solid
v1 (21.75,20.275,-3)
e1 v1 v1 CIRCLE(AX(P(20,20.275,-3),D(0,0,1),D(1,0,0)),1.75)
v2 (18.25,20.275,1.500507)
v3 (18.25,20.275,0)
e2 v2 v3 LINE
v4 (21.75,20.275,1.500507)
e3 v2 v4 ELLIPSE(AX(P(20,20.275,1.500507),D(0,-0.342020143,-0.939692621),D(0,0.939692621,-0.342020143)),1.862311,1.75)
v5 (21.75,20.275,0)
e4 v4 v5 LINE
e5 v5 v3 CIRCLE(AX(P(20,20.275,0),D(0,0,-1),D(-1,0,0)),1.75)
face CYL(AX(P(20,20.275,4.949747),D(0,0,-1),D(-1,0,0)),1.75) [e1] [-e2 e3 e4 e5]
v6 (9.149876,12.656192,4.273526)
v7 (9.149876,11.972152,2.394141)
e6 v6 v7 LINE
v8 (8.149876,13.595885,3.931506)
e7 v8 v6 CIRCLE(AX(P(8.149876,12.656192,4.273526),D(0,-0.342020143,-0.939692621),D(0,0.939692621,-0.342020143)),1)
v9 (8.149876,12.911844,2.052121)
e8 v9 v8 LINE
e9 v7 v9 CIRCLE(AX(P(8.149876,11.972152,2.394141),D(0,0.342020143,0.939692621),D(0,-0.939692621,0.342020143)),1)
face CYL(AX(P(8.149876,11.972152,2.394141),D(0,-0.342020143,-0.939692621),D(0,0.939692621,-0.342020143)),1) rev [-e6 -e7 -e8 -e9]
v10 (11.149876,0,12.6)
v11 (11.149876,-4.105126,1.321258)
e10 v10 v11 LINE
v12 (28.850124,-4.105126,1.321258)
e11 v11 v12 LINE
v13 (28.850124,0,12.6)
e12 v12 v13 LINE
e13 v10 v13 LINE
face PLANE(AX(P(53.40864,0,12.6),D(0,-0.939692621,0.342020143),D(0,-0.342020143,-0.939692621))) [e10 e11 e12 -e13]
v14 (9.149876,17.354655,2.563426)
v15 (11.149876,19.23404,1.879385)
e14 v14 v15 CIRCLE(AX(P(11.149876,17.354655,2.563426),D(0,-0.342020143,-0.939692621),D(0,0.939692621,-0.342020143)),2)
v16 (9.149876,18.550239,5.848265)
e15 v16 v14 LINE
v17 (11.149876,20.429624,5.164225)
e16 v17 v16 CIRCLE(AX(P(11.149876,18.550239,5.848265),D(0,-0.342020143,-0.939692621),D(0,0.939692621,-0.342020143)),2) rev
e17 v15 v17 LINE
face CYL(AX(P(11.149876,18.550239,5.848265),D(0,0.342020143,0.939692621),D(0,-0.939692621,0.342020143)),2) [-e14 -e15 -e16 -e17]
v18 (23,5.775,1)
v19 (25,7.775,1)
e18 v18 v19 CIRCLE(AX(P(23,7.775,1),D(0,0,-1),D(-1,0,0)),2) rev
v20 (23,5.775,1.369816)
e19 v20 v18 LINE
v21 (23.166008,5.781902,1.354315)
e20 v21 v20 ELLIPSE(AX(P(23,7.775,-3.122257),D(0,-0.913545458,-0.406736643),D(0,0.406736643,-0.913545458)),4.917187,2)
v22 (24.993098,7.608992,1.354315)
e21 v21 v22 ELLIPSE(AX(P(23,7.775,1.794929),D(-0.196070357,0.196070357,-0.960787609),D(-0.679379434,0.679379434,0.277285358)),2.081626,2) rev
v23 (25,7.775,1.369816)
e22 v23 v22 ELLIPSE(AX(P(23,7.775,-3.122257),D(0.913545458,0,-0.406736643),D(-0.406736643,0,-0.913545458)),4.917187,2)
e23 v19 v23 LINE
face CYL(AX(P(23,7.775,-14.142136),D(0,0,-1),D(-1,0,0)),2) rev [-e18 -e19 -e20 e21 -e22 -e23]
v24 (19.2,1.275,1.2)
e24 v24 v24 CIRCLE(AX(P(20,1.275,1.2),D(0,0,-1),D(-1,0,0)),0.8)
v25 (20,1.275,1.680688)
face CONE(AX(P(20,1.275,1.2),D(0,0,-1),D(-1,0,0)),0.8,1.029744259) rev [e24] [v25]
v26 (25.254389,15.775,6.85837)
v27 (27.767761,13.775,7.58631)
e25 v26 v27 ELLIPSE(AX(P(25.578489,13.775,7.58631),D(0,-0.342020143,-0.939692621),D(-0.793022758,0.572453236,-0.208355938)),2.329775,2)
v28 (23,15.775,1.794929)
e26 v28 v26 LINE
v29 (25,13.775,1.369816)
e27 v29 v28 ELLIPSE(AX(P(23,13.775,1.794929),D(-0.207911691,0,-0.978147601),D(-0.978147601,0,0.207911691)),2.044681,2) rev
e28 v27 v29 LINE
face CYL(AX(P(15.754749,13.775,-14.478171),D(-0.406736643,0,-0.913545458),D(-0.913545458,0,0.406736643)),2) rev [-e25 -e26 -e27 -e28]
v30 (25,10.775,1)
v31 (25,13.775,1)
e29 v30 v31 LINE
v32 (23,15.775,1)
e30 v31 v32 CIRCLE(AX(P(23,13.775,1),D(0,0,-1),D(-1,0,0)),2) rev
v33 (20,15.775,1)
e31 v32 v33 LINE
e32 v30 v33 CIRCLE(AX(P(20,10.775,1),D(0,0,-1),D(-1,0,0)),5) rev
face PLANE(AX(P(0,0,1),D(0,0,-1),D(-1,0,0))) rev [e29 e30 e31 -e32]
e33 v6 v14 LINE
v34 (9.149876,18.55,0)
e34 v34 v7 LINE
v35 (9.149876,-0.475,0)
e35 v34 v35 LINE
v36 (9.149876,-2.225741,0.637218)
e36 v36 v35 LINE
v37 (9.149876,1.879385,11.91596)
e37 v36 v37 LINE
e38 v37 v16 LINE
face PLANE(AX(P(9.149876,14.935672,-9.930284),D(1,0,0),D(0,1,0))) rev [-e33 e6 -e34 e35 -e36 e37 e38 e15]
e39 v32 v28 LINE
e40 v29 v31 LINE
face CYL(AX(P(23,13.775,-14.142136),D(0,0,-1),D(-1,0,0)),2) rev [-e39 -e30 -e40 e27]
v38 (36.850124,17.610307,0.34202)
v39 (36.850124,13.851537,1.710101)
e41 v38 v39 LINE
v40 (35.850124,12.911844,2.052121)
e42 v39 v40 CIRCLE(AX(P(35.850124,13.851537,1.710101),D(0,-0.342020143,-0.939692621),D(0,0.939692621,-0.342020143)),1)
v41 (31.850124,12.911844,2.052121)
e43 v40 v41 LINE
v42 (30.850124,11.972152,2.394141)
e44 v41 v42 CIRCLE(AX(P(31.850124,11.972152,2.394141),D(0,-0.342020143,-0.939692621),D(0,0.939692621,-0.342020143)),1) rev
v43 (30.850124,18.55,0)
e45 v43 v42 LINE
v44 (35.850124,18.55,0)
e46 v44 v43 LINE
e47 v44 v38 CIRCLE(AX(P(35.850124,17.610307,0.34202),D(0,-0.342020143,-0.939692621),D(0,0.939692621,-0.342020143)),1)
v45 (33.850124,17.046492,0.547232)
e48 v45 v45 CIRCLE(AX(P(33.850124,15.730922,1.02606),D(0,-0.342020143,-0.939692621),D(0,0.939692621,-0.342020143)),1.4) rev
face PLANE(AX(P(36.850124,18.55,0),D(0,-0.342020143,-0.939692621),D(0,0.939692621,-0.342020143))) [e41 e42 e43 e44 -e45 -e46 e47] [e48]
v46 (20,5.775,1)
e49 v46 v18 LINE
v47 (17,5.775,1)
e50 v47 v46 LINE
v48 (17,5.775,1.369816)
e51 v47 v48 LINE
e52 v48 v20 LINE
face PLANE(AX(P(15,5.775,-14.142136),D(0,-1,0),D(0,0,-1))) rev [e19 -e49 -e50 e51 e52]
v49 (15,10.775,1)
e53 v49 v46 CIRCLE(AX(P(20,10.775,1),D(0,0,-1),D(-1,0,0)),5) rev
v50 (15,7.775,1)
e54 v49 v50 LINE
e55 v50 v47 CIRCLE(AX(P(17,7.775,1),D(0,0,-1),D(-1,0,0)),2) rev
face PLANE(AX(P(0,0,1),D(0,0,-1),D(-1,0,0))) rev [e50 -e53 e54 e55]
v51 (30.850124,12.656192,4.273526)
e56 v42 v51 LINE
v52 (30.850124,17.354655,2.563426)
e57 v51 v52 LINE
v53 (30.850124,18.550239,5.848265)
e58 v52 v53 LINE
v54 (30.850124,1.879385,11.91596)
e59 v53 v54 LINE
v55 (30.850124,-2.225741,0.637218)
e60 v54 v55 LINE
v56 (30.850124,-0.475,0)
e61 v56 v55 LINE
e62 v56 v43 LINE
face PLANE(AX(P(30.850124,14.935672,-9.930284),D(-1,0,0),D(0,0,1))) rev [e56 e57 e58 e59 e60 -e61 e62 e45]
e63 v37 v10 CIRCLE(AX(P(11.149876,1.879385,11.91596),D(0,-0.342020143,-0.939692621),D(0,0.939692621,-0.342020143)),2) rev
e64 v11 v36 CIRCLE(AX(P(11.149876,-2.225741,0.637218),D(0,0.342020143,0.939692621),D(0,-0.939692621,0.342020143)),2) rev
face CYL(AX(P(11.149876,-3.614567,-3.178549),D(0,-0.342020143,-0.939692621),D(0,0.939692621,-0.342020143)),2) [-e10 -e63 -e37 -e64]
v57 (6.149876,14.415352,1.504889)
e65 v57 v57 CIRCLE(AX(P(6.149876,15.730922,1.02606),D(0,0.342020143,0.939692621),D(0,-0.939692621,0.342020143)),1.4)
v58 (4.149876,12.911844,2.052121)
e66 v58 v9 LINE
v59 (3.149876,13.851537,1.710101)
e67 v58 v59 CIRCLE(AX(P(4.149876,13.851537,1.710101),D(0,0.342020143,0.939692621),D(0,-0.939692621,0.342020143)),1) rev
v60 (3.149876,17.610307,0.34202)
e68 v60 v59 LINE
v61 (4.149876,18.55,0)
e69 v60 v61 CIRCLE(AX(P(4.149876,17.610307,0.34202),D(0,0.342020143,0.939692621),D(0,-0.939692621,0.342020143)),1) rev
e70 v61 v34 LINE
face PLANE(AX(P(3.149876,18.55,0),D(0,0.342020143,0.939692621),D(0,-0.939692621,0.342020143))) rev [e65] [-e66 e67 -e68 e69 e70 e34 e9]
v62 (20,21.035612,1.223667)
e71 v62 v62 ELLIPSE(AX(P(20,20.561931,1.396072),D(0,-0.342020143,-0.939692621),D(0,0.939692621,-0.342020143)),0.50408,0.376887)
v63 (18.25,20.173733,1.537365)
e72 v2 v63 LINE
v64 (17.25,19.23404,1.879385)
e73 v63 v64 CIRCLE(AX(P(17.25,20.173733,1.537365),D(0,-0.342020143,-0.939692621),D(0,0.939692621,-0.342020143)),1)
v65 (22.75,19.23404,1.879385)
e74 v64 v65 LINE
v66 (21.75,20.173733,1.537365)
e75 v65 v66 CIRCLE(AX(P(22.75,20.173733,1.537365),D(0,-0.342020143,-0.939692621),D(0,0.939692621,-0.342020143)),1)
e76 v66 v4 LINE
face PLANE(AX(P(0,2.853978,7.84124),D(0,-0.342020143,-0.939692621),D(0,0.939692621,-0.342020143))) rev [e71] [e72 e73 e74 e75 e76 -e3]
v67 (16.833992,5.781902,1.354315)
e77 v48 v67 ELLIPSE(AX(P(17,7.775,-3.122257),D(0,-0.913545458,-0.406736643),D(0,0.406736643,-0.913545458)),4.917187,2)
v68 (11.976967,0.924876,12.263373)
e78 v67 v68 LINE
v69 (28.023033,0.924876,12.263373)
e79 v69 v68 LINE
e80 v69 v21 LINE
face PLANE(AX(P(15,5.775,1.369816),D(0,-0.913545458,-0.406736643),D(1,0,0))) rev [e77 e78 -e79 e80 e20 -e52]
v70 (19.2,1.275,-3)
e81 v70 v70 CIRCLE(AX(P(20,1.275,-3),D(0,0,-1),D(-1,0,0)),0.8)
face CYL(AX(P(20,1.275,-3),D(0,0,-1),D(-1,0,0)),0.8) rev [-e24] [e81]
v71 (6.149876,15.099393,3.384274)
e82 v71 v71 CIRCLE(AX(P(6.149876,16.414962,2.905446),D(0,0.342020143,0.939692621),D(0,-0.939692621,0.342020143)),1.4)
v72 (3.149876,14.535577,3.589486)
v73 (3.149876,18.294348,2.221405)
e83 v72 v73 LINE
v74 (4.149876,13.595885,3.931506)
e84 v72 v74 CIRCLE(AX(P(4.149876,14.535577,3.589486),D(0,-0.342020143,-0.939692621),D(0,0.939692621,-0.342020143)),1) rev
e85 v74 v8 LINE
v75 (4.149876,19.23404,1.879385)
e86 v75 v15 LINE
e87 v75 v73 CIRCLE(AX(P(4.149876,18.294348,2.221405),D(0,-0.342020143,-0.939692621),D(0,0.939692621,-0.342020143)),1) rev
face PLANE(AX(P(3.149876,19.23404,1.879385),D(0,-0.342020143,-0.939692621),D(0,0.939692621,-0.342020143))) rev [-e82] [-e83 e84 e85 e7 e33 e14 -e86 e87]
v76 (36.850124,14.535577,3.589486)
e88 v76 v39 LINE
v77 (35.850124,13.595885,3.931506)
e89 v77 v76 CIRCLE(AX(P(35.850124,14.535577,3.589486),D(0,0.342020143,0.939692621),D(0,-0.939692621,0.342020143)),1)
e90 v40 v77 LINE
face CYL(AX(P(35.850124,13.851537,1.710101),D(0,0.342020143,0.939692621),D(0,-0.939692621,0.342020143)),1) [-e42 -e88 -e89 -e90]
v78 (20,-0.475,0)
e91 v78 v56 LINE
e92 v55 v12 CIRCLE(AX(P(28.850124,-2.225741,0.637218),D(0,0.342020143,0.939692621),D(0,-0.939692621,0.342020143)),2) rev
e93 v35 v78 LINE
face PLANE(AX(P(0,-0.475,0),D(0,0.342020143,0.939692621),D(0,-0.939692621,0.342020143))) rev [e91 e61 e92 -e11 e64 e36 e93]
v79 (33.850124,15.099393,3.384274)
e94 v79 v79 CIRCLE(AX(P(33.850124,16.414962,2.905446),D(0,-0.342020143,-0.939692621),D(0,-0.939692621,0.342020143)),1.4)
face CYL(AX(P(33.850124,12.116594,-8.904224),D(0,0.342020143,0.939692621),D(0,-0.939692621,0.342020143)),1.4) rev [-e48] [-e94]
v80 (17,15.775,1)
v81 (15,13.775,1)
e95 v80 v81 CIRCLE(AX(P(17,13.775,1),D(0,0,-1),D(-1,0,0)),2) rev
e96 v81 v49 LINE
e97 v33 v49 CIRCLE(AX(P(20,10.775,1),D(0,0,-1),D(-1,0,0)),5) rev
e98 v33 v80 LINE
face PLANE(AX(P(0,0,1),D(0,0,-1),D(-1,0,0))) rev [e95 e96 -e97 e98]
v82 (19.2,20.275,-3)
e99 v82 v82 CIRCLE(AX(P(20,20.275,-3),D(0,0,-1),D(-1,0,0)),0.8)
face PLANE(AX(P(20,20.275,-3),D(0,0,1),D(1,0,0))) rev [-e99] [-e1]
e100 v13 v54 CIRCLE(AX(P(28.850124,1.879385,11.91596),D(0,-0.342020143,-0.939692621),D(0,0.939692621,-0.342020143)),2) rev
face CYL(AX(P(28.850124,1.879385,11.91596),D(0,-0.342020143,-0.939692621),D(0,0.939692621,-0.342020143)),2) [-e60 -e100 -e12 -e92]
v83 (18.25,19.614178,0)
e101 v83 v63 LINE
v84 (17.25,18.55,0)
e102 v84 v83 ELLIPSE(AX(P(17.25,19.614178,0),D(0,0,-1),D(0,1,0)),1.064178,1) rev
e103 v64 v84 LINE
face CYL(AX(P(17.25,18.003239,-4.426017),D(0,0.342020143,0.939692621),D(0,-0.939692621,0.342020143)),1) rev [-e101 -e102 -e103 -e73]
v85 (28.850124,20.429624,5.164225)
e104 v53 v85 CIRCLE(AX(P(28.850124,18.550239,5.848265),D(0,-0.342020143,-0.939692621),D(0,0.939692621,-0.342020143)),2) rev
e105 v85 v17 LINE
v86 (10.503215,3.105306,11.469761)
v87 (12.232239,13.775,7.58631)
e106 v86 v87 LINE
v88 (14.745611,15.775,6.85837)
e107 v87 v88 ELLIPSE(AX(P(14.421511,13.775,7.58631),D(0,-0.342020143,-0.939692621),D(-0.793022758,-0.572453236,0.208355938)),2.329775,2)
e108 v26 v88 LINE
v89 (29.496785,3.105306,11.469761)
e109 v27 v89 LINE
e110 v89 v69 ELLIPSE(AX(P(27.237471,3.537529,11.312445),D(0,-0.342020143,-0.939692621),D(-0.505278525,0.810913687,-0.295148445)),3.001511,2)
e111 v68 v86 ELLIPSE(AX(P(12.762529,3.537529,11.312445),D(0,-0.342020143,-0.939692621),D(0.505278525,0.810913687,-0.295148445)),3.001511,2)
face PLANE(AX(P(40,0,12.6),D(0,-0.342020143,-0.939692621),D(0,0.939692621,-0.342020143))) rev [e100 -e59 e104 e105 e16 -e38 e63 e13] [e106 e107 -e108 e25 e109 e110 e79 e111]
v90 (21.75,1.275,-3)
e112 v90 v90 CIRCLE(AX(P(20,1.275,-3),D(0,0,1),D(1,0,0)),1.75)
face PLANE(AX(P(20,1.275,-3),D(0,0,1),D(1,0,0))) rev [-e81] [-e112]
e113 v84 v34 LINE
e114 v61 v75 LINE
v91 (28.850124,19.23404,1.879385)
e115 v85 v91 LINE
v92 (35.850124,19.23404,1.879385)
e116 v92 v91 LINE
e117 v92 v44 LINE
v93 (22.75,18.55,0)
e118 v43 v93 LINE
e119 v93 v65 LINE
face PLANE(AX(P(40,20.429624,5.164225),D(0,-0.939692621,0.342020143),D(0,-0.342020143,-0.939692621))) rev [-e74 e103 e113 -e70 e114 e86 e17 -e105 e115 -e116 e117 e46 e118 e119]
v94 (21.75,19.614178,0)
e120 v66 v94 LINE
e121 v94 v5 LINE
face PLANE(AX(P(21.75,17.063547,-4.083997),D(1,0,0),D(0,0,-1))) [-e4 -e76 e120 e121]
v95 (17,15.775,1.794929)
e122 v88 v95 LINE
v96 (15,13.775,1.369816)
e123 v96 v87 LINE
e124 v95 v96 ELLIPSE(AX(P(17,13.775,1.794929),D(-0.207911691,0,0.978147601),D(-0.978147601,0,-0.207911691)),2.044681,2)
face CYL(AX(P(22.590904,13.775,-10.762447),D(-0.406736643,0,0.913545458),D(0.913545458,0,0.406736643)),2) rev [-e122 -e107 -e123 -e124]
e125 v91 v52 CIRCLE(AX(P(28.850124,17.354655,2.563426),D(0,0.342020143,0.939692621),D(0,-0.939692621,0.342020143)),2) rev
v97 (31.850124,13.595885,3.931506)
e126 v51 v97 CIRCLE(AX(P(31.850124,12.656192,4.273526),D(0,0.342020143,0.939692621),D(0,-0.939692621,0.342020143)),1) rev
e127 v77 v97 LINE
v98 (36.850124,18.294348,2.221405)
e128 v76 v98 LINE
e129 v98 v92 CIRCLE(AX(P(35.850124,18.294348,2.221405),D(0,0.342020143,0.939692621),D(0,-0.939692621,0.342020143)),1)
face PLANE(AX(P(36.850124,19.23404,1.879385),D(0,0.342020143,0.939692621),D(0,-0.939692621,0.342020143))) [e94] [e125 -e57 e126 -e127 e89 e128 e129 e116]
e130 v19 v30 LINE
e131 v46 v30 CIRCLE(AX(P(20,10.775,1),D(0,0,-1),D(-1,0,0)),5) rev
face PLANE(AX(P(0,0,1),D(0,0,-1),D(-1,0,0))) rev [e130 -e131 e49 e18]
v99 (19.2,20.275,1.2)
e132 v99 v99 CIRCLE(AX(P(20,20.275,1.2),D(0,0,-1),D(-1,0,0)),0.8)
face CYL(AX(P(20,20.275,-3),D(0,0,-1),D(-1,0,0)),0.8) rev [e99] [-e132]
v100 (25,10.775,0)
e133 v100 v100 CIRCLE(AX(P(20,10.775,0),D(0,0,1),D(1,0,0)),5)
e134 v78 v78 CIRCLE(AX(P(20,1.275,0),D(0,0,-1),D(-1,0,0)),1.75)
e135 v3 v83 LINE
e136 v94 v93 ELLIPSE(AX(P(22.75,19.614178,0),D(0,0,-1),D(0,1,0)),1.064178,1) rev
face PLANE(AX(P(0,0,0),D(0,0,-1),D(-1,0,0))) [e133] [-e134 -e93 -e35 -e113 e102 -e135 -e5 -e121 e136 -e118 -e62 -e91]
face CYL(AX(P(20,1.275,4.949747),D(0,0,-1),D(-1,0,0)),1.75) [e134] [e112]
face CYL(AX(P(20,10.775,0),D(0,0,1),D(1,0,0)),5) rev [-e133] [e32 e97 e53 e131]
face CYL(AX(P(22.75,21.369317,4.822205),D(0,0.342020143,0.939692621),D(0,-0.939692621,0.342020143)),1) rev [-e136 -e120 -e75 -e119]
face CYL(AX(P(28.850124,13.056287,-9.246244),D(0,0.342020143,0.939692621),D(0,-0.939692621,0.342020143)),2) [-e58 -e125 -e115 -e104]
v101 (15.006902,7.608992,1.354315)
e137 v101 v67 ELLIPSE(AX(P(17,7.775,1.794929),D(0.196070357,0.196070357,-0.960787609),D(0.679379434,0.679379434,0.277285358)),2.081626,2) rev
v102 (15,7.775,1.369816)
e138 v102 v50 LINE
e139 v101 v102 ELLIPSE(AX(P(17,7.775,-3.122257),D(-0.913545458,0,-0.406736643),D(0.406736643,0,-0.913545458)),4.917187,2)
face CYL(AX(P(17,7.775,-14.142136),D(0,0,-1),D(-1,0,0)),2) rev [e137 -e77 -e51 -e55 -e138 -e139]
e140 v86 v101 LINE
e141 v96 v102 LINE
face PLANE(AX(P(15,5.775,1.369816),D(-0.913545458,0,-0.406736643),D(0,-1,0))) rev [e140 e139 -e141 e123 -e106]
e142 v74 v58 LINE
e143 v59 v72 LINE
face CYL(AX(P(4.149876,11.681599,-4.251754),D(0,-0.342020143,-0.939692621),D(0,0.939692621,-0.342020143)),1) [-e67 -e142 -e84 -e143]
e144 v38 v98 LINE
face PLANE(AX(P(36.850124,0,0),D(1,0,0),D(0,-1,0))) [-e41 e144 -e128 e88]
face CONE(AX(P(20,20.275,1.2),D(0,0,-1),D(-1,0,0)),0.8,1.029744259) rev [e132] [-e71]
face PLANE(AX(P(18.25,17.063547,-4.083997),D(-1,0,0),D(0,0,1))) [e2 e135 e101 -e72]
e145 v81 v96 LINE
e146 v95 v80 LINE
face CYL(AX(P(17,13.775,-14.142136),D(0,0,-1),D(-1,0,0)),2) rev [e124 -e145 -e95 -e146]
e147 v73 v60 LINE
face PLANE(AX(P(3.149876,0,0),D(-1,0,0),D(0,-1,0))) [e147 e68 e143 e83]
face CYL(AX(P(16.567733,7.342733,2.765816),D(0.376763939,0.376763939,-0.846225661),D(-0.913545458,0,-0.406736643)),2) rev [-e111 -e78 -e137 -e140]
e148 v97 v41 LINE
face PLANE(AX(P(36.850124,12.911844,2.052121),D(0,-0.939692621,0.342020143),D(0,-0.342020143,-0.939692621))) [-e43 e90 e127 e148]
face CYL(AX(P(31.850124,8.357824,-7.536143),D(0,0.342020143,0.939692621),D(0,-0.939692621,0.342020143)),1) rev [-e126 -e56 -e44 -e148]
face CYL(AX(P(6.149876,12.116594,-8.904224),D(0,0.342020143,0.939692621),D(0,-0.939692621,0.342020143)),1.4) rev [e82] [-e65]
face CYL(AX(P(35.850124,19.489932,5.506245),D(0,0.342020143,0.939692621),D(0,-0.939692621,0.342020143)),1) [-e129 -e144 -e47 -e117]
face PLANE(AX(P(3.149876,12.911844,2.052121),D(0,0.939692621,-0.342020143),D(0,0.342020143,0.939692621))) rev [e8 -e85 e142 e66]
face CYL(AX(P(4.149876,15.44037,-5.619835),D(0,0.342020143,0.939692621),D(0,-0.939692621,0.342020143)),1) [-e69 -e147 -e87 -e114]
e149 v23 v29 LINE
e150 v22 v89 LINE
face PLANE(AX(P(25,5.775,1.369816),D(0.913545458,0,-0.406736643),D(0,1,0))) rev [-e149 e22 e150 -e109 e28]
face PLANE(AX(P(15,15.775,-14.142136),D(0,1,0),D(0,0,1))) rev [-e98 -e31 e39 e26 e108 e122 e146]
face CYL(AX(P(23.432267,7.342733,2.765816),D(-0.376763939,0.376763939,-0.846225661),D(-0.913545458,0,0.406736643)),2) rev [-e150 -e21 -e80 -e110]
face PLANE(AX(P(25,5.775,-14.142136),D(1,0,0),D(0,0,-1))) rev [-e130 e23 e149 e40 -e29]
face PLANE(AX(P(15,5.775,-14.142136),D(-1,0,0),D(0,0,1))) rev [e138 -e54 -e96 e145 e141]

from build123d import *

# Parameters (mm, degrees)
BOSS_EXTRUDE1_DEPTH   = 12.6
SKETCH2_R             = 5.0000000000000036
CUT_EXTRUDE1_DEPTH    = 48.150424176246815
SKETCH3_W             = 10.00000000000001
SKETCH3_H             = 10.000000000000007
CUT_EXTRUDE2_DEPTH    = 11.6
CHAMFER1_SIZE         = 5
CHAMFER1_SIZE2        = 11.230183869521158
CUT_EXTRUDE3_DEPTH    = 48.150424176246815
BOSS_EXTRUDE2_DEPTH   = 40
SKETCH6_R             = 1.7500000000000004
SKETCH6_R_2           = 1.7500000000000002
BOSS_EXTRUDE3_DEPTH   = 3
CUT_EXTRUDE4_DEPTH    = 48.369406002186686
CUT_EXTRUDE5_DEPTH    = 47.07236166447865
BOSS_EXTRUDE4_DEPTH   = 6
SKETCH12_R            = 1.4000000000000001
CUT_EXTRUDE6_DEPTH    = 38.90502227131958
BOSS_EXTRUDE5_REACH   = 44.93
SKETCH14_W            = 3.5000000000000036
SKETCH14_H            = 3.265431857231029
CUT_EXTRUDE7_REACH    = 46.879
CUT_EXTRUDE8_REACH    = 46.879
M2_TAPPED_HOLE1_D     = 1.6
M2_TAPPED_HOLE1_DEPTH = 4.2
M2_TAPPED_HOLE1_TIP   = 0.48068849522204826
FILLET1_R             = 1
FILLET2_R             = 2
FILLET4_R             = 2


with BuildPart() as part:
    # Sketch1 → Boss-Extrude1 (new body)
    with BuildSketch(Plane.XY):
        Polygon((0, 0), (40, 0), (39.99999999999999, 21.550000000000004), (0, 21.550000000000004), align=None)
    extrude(amount=BOSS_EXTRUDE1_DEPTH)

    # Sketch2 → Cut-Extrude1 (cut, through all)
    with BuildSketch(Plane.XY.offset(12.6)):
        with Locations((19.999999999999996, 10.775000000000004)):
            Circle(SKETCH2_R)
    extrude(amount=-CUT_EXTRUDE1_DEPTH, mode=Mode.SUBTRACT)

    # Sketch3 → Cut-Extrude2 (cut)
    with BuildSketch(Plane.XY.offset(12.6)):
        with Locations((20, 10.775000000000002)):
            Rectangle(SKETCH3_W, SKETCH3_H)
    extrude(amount=-CUT_EXTRUDE2_DEPTH, mode=Mode.SUBTRACT)

    # Chamfer1
    chamfer1_edges = [part.edges().sort_by_distance(p)[0] for p in [
        (14.999999999999993, 10.775000000000002, 12.6),
        (19.999999999999996, 5.7749999999999995, 12.6),
        (25, 10.775000000000004, 12.6),
    ]]
    chamfer1_side = [part.faces().sort_by_distance(p)[0] for p in [
        (20, 0.45435696319083746, 12.6),
    ]]
    chamfer(chamfer1_edges, length=CHAMFER1_SIZE, length2=CHAMFER1_SIZE2, reference=chamfer1_side[0])

    # Sketch4 → Cut-Extrude3 (cut, through all)
    with BuildSketch(Plane.ZY):
        Polygon((12.6, 0), (5.164224911806891, 20.42962415095372), (0, 18.550000000000004), (0, 21.550000000000004), (12.6, 21.550000000000004), align=None)
    extrude(amount=-CUT_EXTRUDE3_DEPTH, mode=Mode.SUBTRACT)

    # Sketch5 → Boss-Extrude2 (add)
    with BuildSketch(Plane.ZY):
        Polygon((12.6, 0), (0, -4.5860249517541645), (0, 0), align=None)
    extrude(amount=-BOSS_EXTRUDE2_DEPTH)

    # Sketch6 → Boss-Extrude3 (add)
    with BuildSketch(Plane.XY.offset(-2.9999999999999996)):
        with Locations(Location((19.999999999999996, 20.275000000000002, 0), (0, 0, 260.303678946))):
            Circle(SKETCH6_R)
        with Locations(Location((20, 1.275000000000002, 0), (0, 0, 180))):
            Circle(SKETCH6_R_2)
    extrude(amount=BOSS_EXTRUDE3_DEPTH)

    # Sketch7 → Cut-Extrude4 (cut, through all)
    with BuildSketch(Plane(origin=(40, 1.288e-14, 0), x_dir=(0, 0, -1), z_dir=(1, 3.2e-16, 0))):
        Polygon((0, -4.586024951754178), (0, -0.47500000000000464), (-1.3212579510498954, -4.105126385784462), align=None)
    extrude(amount=-CUT_EXTRUDE4_DEPTH, mode=Mode.SUBTRACT)

    # Sketch8 → Cut-Extrude5 (cut, through all)
    with BuildSketch(Plane(origin=(0, 4.049561941025207, 11.126079991649561), x_dir=(1, 0, 0), z_dir=(0, 0.34202014332566943, 0.9396926207859082))):
        Polygon((0, 17.4312981155786), (9.149876173671583, 17.4312981155786), (9.149876173671586, -4.309453805903435), (0, -4.309453805903436), align=None)
        Polygon((40, -4.309453805903436), (30.850123826328417, -4.309453805903435), (30.850123826328417, 17.4312981155786), (40, 17.4312981155786), align=None)
    extrude(amount=-CUT_EXTRUDE5_DEPTH, mode=Mode.SUBTRACT)

    # Sketch11 → Boss-Extrude4 (add)
    with BuildSketch(Plane.ZY.offset(-9.149876173671585)):
        Polygon((4.8e-16, 18.550000000000008), (1.879385241571817, 19.234040286651346), (3.9315061015258332, 13.595884561935897), (2.0521208599540164, 12.911844275284558), align=None)
    boss_extrude4 = extrude(amount=BOSS_EXTRUDE4_DEPTH)

    # Sketch12 → Cut-Extrude6 (cut, through all)
    with BuildSketch(Plane(origin=(0, 2.8539780767228278, 7.841240321414484), x_dir=(1, 0, 0), z_dir=(0, 0.3420201433256694, 0.9396926207859083))):
        with Locations(Location((6.149876173671584, 14.431298115578603, 0), (0, 0, 270))):
            Circle(SKETCH12_R)
    cut_extrude6 = extrude(amount=-CUT_EXTRUDE6_DEPTH, mode=Mode.SUBTRACT)

    # Mirror1: Boss-Extrude4, Cut-Extrude6 across plane
    add(boss_extrude4.mirror(Plane.ZY.offset(-19.999999999999996)))
    add(cut_extrude6.mirror(Plane.ZY.offset(-19.999999999999996)), mode=Mode.SUBTRACT)

    # Boss-Extrude5: up to this plane
    boss_extrude5_end = Plane(origin=(0, 0, 0), z_dir=(0, 0, -1))
    # Sketch14 → Boss-Extrude5 (add, up to the surface)
    with BuildSketch(Plane(origin=(0, 2.8539780767228278, 7.841240321414484), x_dir=(1, 0, 0), z_dir=(0, 0.3420201433256694, 0.9396926207859083)), mode=Mode.PRIVATE) as boss_extrude5_sk1:
        with Locations((20, 19.064014044194117)):
            Rectangle(SKETCH14_W, SKETCH14_H)
    boss_extrude5_tool1 = split(extrude(boss_extrude5_sk1.sketch, amount=-BOSS_EXTRUDE5_REACH, mode=Mode.PRIVATE), bisect_by=boss_extrude5_end, keep=Keep.BOTH, mode=Mode.PRIVATE)
    add(boss_extrude5_tool1.solids().sort_by_distance((20, 20.768291, 1.320964))[0])

    # Cut-Extrude7: up to this plane
    cut_extrude7_end = Plane(origin=(0, 2.8539780767228256, 7.841240321414483), z_dir=(0, -0.3420201433256692, -0.9396926207859083))
    # Sketch15 → Cut-Extrude7 (cut, up to the surface)
    with BuildSketch(Plane(origin=(0, 0, 0), x_dir=(-1, 0, 0), z_dir=(0, 0, -1)), mode=Mode.PRIVATE) as cut_extrude7_sk1:
        with BuildLine():
            Line((-19.999999999999996, 22.025000000000006), (-21.75, 22.02500000000001))
            Line((-21.75, 22.02500000000001), (-21.750000000000004, 20.275000000000002))
            ThreePointArc((-21.750000000000004, 20.275000000000002), (-21.237436867076458, 21.512436867076463), (-19.999999999999996, 22.025000000000006))
        make_face()
    cut_extrude7_tool1 = split(extrude(cut_extrude7_sk1.sketch, amount=-CUT_EXTRUDE7_REACH, mode=Mode.PRIVATE), bisect_by=cut_extrude7_end, keep=Keep.BOTH, mode=Mode.PRIVATE)
    add(cut_extrude7_tool1.solids().sort_by_distance((21.359106, 21.634106, 0))[0], mode=Mode.SUBTRACT)

    # Cut-Extrude8: up to this plane
    cut_extrude8_end = Plane(origin=(0, 2.8539780767228256, 7.841240321414483), z_dir=(0, -0.3420201433256692, -0.9396926207859083))
    # Sketch16 → Cut-Extrude8 (cut, up to the surface)
    with BuildSketch(Plane(origin=(0, 0, 0), x_dir=(-1, 0, 0), z_dir=(0, 0, -1)), mode=Mode.PRIVATE) as cut_extrude8_sk1:
        with BuildLine():
            Line((-18.249999999999993, 20.275000000000002), (-18.249999999999996, 22.02500000000001))
            Line((-18.249999999999996, 22.02500000000001), (-19.999999999999996, 22.025000000000006))
            ThreePointArc((-19.999999999999996, 22.025000000000006), (-18.762563132923535, 21.512436867076463), (-18.249999999999993, 20.275000000000002))
        make_face()
    cut_extrude8_tool1 = split(extrude(cut_extrude8_sk1.sketch, amount=-CUT_EXTRUDE8_REACH, mode=Mode.PRIVATE), bisect_by=cut_extrude8_end, keep=Keep.BOTH, mode=Mode.PRIVATE)
    add(cut_extrude8_tool1.solids().sort_by_distance((18.640894, 21.634106, 0))[0], mode=Mode.SUBTRACT)


with BuildPart() as body_2:
    # of the pieces the cut leaves, the one that is kept (cut_extrude8_keep)
    add(part.part.solids().sort_by_distance((30.850123826, -0.475, 0))[0])

    # M2 Tapped Hole1
    with Locations(Plane(origin=(20, 20.275, -3), x_dir=(-1, 0, 0), z_dir=(0, 0, -1))):
        with Locations((0, 0), (0, -19)):
            Hole(M2_TAPPED_HOLE1_D / 2, depth=M2_TAPPED_HOLE1_DEPTH)
            with Locations((0, 0, -(M2_TAPPED_HOLE1_DEPTH + M2_TAPPED_HOLE1_TIP / 2))):  # 118° drill point
                Cone(0, M2_TAPPED_HOLE1_D / 2, M2_TAPPED_HOLE1_TIP, mode=Mode.SUBTRACT)

    # Fillet1
    fillet1_edges = [body_2.edges().sort_by_distance(p)[0] for p in [
        (18.249999999999996, 18.89202014332568, 0.9396926207859103),
        (21.75, 18.89202014332568, 0.9396926207859103),
        (36.85012382632841, 18.892020143325677, 0.9396926207859077),
        (30.850123826328407, 13.253864418610231, 2.9918134807399235),
        (9.149876173671583, 13.25386441861023, 2.9918134807399244),
        (3.149876173671583, 13.253864418610227, 2.991813480739925),
        (3.149876173671582, 18.892020143325677, 0.9396926207859085),
        (36.85012382632841, 13.253864418610231, 2.991813480739924),
    ]]
    fillet(fillet1_edges, radius=FILLET1_R)

    # Fillet2
    fillet2_edges = [body_2.edges().sort_by_distance(p)[0] for p in [
        (9.149876173671586, -2.052563192892223, 6.960628975524948),
        (9.149876173671583, 19.831832218802536, 3.521805076689357),
        (30.850123826328417, -2.0525631928922223, 6.9606289755249495),
        (30.850123826328417, 19.831832218802536, 3.5218050766893576),
    ]]
    fillet(fillet2_edges, radius=FILLET2_R)

    # Fillet4
    fillet4_edges = [body_2.edges().sort_by_distance(p)[0] for p in [
        (26.22183071260031, 15.775000000000007, 4.114092842464741),
    ]]
    fillet(fillet4_edges, radius=FILLET4_R)
    fillet4_2_edges = [body_2.edges().sort_by_distance(p)[0] for p in [
        (13.778169287399688, 15.775000000000006, 4.114092842464743),
    ]]
    fillet(fillet4_2_edges, radius=FILLET4_R)
    fillet4_3_edges = [body_2.edges().sort_by_distance(p)[0] for p in [
        (14.999999999999993, 15.775000000000007, 1.184908065239421),
    ]]
    fillet(fillet4_3_edges, radius=FILLET4_R)
    fillet4_4_edges = [body_2.edges().sort_by_distance(p)[0] for p in [
        (25, 15.775000000000007, 1.184908065239421),
    ]]
    fillet(fillet4_4_edges, radius=FILLET4_R)
    fillet4_5_edges = [body_2.edges().sort_by_distance(p)[0] for p in [
        (12.574938086835799, 3.3499380868358024, 6.81659436644018),
    ]]
    fillet(fillet4_5_edges, radius=FILLET4_R)
    fillet4_6_edges = [body_2.edges().sort_by_distance(p)[0] for p in [
        (27.425061913164196, 3.349938086835803, 6.816594366440178),
    ]]
    fillet(fillet4_6_edges, radius=FILLET4_R)
    fillet4_7_edges = [body_2.edges().sort_by_distance(p)[0] for p in [
        (25, 5.7749999999999995, 1.7667114299152384),
    ]]
    fillet(fillet4_7_edges, radius=FILLET4_R)
    fillet4_8_edges = [body_2.edges().sort_by_distance(p)[0] for p in [
        (14.999999999999993, 5.7749999999999995, 1.766711429915226),
    ]]
    fillet(fillet4_8_edges, radius=FILLET4_R)


solid = body_2.part
